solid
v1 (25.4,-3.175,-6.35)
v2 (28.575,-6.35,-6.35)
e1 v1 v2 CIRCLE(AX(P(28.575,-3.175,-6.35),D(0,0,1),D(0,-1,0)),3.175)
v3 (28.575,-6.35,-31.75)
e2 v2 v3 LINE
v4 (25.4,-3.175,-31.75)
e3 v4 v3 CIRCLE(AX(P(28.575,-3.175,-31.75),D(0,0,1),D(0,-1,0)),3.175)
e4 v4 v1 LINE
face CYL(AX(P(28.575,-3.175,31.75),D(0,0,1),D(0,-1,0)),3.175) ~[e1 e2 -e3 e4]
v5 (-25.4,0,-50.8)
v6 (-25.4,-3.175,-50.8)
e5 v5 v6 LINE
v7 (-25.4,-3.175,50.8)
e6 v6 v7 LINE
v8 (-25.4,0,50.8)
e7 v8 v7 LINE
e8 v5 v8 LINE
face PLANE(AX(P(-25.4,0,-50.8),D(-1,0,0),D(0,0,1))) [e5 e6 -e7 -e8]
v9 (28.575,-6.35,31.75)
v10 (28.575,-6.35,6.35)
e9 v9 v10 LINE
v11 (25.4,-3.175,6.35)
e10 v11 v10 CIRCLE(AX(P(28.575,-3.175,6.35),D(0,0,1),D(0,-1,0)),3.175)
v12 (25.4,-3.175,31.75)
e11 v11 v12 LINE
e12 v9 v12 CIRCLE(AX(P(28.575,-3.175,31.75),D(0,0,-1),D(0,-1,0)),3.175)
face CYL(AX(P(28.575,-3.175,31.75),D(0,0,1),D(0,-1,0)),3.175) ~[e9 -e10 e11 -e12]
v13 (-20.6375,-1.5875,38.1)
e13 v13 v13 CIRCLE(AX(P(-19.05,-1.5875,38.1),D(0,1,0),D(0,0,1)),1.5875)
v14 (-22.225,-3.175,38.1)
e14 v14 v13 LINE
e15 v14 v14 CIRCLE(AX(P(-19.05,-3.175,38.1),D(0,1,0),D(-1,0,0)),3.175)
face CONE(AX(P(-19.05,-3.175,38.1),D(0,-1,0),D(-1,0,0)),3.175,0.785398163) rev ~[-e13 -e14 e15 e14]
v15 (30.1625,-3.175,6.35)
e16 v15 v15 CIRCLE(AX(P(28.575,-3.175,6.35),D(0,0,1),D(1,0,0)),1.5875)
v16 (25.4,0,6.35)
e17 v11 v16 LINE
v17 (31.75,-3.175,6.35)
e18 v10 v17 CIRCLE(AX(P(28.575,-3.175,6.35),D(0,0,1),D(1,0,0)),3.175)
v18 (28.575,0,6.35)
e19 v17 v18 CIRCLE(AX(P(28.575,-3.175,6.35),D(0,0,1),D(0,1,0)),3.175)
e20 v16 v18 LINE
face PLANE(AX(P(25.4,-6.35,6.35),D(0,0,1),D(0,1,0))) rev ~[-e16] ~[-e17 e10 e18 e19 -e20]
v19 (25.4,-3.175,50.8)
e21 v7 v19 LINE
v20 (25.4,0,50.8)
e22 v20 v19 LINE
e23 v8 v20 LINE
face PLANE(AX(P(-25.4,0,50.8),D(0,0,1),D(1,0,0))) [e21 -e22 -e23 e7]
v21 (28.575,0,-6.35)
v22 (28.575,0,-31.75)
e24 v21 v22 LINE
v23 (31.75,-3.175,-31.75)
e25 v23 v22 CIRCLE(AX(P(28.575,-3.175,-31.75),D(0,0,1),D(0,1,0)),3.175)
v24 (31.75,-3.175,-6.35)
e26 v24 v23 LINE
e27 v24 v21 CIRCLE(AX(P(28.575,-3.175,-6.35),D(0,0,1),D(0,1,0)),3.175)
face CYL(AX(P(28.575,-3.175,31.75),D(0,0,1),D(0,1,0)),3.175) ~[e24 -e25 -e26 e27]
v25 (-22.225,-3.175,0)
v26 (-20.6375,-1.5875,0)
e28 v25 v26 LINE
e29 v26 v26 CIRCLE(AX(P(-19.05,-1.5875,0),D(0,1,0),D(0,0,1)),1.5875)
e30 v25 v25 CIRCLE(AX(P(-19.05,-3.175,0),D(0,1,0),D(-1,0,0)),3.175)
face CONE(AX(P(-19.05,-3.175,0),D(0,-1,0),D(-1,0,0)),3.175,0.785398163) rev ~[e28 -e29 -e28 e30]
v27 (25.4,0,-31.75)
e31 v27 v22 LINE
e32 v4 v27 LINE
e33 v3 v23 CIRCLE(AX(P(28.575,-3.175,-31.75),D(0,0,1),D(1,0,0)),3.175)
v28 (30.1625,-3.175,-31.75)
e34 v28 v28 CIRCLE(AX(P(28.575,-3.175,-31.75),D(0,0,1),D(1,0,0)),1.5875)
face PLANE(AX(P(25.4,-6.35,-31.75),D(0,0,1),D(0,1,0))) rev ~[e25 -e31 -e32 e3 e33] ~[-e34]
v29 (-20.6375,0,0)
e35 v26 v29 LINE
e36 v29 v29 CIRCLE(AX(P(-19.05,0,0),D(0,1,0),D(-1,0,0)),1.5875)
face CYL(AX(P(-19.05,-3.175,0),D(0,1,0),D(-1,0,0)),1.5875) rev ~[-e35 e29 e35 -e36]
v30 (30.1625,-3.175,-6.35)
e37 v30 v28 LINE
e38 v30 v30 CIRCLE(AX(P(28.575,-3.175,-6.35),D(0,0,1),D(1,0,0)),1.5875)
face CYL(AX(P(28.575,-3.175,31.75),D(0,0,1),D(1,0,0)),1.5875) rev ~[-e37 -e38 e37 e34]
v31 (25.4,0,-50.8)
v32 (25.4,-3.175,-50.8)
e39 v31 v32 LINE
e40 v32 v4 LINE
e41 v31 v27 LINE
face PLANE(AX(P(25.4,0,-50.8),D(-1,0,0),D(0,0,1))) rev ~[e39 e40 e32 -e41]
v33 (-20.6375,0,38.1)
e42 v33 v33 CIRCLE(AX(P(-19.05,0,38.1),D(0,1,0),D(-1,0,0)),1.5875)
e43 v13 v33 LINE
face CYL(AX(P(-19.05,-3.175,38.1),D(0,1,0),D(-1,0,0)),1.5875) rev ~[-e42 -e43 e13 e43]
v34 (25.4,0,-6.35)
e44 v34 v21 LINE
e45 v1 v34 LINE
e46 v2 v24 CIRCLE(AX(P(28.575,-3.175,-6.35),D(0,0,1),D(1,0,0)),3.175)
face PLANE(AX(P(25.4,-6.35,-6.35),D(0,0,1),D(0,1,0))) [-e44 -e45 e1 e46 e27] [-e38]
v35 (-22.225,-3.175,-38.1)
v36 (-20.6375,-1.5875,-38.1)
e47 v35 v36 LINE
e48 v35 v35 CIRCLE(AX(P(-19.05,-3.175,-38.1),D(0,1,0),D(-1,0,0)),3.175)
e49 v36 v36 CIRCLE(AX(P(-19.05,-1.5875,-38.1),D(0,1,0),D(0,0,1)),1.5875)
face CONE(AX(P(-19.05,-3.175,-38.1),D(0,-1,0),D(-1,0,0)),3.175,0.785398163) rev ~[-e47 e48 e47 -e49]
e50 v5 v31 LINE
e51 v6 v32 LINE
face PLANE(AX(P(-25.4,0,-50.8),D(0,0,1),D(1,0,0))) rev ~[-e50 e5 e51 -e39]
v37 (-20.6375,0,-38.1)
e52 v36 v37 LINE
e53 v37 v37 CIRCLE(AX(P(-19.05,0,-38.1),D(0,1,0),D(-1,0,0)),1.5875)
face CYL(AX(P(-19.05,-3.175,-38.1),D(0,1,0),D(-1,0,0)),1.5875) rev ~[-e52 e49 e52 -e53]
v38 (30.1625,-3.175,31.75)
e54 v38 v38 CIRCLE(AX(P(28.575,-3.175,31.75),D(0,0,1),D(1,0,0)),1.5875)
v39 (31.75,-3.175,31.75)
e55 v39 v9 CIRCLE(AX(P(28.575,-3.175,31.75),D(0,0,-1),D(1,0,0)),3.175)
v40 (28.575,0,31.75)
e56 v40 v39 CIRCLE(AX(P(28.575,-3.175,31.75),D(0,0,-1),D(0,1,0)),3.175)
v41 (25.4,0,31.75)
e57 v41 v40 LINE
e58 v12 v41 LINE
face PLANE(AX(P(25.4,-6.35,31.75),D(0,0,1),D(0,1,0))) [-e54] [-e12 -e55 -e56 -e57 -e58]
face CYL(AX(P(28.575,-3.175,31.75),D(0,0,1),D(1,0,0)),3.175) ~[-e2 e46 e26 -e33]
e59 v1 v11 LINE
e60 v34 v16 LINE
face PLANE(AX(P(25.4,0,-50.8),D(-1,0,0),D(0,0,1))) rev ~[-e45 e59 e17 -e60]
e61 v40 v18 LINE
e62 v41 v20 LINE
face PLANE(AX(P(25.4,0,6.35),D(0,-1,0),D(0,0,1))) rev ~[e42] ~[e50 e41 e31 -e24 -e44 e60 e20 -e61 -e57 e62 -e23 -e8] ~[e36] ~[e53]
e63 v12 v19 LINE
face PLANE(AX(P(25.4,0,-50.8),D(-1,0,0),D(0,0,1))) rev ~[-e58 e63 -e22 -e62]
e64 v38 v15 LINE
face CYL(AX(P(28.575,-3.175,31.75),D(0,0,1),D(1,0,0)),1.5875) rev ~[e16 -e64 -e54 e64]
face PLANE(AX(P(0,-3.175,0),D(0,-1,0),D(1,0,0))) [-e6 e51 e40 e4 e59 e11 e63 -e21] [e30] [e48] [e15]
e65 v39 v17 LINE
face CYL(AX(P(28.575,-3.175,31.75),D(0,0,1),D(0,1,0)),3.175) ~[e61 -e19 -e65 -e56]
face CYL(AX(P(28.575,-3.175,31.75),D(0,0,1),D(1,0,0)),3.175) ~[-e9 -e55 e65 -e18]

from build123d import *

# Parameters (mm, degrees)
F0_W           = 50.8
F0_H           = 101.6
F1_DEPTH       = 3.175
F2_W           = 6.35
F2_H           = 25.4
F3_DEPTH       = 6.35
F5_DEPTH       = 82.551
F6_R           = 1.5875
F7_DEPTH       = 82.551
F9_D           = 3.175
F9_CSINK_D     = 6.35
F9_CSINK_ANGLE = 90


with BuildPart() as f1:
    # F0 (on Front) → F1 (new body)
    with BuildSketch(Plane.XZ):
        Rectangle(F0_W, F0_H)
    extrude(amount=F1_DEPTH)

    # F2 (on face) → F3 (join)
    with BuildSketch(Plane.YZ.offset(25.4)):
        with Locations((-3.175, 19.05)):
            Rectangle(F2_W, F2_H)
        with Locations((-3.175, -19.05)):
            Rectangle(F2_W, F2_H)
    extrude(amount=F3_DEPTH)

    # F4 (on face) → F5 (cut, through all)
    with BuildSketch(Plane.XY.offset(31.75)):
        with BuildLine():
            Line((31.75, -6.35), (31.75, -3.175))
            ThreePointArc((31.75, -3.175), (30.8200640303, -5.4200640303), (28.575, -6.35))
            Line((28.575, -6.35), (31.75, -6.35))
        make_face()
        with BuildLine():
            ThreePointArc((28.575, 0), (30.8200640303, -0.9299359697), (31.75, -3.175))
            Line((31.75, -3.175), (31.75, 0))
            Line((31.75, 0), (28.575, 0))
        make_face()
        with BuildLine():
            Line((25.4, -6.35), (28.575, -6.35))
            ThreePointArc((28.575, -6.35), (26.3299359697, -5.4200640303), (25.4, -3.175))
            Line((25.4, -3.175), (25.4, -6.35))
        make_face()
    extrude(amount=-F5_DEPTH, mode=Mode.SUBTRACT)

    # F6 (on face) → F7 (cut, through all)
    with BuildSketch(Plane.XY.offset(31.75)):
        with Locations((28.575, -3.175)):
            Circle(F6_R)
    extrude(amount=-F7_DEPTH, mode=Mode.SUBTRACT)

    # F9 (through all)
    with Locations(Plane.XZ.offset(3.175)):
        with Locations((-19.05, 38.1), (-19.05, 0), (-19.05, -38.1)):
            CounterSinkHole(F9_D / 2, F9_CSINK_D / 2, counter_sink_angle=F9_CSINK_ANGLE)


solid = f1.part
